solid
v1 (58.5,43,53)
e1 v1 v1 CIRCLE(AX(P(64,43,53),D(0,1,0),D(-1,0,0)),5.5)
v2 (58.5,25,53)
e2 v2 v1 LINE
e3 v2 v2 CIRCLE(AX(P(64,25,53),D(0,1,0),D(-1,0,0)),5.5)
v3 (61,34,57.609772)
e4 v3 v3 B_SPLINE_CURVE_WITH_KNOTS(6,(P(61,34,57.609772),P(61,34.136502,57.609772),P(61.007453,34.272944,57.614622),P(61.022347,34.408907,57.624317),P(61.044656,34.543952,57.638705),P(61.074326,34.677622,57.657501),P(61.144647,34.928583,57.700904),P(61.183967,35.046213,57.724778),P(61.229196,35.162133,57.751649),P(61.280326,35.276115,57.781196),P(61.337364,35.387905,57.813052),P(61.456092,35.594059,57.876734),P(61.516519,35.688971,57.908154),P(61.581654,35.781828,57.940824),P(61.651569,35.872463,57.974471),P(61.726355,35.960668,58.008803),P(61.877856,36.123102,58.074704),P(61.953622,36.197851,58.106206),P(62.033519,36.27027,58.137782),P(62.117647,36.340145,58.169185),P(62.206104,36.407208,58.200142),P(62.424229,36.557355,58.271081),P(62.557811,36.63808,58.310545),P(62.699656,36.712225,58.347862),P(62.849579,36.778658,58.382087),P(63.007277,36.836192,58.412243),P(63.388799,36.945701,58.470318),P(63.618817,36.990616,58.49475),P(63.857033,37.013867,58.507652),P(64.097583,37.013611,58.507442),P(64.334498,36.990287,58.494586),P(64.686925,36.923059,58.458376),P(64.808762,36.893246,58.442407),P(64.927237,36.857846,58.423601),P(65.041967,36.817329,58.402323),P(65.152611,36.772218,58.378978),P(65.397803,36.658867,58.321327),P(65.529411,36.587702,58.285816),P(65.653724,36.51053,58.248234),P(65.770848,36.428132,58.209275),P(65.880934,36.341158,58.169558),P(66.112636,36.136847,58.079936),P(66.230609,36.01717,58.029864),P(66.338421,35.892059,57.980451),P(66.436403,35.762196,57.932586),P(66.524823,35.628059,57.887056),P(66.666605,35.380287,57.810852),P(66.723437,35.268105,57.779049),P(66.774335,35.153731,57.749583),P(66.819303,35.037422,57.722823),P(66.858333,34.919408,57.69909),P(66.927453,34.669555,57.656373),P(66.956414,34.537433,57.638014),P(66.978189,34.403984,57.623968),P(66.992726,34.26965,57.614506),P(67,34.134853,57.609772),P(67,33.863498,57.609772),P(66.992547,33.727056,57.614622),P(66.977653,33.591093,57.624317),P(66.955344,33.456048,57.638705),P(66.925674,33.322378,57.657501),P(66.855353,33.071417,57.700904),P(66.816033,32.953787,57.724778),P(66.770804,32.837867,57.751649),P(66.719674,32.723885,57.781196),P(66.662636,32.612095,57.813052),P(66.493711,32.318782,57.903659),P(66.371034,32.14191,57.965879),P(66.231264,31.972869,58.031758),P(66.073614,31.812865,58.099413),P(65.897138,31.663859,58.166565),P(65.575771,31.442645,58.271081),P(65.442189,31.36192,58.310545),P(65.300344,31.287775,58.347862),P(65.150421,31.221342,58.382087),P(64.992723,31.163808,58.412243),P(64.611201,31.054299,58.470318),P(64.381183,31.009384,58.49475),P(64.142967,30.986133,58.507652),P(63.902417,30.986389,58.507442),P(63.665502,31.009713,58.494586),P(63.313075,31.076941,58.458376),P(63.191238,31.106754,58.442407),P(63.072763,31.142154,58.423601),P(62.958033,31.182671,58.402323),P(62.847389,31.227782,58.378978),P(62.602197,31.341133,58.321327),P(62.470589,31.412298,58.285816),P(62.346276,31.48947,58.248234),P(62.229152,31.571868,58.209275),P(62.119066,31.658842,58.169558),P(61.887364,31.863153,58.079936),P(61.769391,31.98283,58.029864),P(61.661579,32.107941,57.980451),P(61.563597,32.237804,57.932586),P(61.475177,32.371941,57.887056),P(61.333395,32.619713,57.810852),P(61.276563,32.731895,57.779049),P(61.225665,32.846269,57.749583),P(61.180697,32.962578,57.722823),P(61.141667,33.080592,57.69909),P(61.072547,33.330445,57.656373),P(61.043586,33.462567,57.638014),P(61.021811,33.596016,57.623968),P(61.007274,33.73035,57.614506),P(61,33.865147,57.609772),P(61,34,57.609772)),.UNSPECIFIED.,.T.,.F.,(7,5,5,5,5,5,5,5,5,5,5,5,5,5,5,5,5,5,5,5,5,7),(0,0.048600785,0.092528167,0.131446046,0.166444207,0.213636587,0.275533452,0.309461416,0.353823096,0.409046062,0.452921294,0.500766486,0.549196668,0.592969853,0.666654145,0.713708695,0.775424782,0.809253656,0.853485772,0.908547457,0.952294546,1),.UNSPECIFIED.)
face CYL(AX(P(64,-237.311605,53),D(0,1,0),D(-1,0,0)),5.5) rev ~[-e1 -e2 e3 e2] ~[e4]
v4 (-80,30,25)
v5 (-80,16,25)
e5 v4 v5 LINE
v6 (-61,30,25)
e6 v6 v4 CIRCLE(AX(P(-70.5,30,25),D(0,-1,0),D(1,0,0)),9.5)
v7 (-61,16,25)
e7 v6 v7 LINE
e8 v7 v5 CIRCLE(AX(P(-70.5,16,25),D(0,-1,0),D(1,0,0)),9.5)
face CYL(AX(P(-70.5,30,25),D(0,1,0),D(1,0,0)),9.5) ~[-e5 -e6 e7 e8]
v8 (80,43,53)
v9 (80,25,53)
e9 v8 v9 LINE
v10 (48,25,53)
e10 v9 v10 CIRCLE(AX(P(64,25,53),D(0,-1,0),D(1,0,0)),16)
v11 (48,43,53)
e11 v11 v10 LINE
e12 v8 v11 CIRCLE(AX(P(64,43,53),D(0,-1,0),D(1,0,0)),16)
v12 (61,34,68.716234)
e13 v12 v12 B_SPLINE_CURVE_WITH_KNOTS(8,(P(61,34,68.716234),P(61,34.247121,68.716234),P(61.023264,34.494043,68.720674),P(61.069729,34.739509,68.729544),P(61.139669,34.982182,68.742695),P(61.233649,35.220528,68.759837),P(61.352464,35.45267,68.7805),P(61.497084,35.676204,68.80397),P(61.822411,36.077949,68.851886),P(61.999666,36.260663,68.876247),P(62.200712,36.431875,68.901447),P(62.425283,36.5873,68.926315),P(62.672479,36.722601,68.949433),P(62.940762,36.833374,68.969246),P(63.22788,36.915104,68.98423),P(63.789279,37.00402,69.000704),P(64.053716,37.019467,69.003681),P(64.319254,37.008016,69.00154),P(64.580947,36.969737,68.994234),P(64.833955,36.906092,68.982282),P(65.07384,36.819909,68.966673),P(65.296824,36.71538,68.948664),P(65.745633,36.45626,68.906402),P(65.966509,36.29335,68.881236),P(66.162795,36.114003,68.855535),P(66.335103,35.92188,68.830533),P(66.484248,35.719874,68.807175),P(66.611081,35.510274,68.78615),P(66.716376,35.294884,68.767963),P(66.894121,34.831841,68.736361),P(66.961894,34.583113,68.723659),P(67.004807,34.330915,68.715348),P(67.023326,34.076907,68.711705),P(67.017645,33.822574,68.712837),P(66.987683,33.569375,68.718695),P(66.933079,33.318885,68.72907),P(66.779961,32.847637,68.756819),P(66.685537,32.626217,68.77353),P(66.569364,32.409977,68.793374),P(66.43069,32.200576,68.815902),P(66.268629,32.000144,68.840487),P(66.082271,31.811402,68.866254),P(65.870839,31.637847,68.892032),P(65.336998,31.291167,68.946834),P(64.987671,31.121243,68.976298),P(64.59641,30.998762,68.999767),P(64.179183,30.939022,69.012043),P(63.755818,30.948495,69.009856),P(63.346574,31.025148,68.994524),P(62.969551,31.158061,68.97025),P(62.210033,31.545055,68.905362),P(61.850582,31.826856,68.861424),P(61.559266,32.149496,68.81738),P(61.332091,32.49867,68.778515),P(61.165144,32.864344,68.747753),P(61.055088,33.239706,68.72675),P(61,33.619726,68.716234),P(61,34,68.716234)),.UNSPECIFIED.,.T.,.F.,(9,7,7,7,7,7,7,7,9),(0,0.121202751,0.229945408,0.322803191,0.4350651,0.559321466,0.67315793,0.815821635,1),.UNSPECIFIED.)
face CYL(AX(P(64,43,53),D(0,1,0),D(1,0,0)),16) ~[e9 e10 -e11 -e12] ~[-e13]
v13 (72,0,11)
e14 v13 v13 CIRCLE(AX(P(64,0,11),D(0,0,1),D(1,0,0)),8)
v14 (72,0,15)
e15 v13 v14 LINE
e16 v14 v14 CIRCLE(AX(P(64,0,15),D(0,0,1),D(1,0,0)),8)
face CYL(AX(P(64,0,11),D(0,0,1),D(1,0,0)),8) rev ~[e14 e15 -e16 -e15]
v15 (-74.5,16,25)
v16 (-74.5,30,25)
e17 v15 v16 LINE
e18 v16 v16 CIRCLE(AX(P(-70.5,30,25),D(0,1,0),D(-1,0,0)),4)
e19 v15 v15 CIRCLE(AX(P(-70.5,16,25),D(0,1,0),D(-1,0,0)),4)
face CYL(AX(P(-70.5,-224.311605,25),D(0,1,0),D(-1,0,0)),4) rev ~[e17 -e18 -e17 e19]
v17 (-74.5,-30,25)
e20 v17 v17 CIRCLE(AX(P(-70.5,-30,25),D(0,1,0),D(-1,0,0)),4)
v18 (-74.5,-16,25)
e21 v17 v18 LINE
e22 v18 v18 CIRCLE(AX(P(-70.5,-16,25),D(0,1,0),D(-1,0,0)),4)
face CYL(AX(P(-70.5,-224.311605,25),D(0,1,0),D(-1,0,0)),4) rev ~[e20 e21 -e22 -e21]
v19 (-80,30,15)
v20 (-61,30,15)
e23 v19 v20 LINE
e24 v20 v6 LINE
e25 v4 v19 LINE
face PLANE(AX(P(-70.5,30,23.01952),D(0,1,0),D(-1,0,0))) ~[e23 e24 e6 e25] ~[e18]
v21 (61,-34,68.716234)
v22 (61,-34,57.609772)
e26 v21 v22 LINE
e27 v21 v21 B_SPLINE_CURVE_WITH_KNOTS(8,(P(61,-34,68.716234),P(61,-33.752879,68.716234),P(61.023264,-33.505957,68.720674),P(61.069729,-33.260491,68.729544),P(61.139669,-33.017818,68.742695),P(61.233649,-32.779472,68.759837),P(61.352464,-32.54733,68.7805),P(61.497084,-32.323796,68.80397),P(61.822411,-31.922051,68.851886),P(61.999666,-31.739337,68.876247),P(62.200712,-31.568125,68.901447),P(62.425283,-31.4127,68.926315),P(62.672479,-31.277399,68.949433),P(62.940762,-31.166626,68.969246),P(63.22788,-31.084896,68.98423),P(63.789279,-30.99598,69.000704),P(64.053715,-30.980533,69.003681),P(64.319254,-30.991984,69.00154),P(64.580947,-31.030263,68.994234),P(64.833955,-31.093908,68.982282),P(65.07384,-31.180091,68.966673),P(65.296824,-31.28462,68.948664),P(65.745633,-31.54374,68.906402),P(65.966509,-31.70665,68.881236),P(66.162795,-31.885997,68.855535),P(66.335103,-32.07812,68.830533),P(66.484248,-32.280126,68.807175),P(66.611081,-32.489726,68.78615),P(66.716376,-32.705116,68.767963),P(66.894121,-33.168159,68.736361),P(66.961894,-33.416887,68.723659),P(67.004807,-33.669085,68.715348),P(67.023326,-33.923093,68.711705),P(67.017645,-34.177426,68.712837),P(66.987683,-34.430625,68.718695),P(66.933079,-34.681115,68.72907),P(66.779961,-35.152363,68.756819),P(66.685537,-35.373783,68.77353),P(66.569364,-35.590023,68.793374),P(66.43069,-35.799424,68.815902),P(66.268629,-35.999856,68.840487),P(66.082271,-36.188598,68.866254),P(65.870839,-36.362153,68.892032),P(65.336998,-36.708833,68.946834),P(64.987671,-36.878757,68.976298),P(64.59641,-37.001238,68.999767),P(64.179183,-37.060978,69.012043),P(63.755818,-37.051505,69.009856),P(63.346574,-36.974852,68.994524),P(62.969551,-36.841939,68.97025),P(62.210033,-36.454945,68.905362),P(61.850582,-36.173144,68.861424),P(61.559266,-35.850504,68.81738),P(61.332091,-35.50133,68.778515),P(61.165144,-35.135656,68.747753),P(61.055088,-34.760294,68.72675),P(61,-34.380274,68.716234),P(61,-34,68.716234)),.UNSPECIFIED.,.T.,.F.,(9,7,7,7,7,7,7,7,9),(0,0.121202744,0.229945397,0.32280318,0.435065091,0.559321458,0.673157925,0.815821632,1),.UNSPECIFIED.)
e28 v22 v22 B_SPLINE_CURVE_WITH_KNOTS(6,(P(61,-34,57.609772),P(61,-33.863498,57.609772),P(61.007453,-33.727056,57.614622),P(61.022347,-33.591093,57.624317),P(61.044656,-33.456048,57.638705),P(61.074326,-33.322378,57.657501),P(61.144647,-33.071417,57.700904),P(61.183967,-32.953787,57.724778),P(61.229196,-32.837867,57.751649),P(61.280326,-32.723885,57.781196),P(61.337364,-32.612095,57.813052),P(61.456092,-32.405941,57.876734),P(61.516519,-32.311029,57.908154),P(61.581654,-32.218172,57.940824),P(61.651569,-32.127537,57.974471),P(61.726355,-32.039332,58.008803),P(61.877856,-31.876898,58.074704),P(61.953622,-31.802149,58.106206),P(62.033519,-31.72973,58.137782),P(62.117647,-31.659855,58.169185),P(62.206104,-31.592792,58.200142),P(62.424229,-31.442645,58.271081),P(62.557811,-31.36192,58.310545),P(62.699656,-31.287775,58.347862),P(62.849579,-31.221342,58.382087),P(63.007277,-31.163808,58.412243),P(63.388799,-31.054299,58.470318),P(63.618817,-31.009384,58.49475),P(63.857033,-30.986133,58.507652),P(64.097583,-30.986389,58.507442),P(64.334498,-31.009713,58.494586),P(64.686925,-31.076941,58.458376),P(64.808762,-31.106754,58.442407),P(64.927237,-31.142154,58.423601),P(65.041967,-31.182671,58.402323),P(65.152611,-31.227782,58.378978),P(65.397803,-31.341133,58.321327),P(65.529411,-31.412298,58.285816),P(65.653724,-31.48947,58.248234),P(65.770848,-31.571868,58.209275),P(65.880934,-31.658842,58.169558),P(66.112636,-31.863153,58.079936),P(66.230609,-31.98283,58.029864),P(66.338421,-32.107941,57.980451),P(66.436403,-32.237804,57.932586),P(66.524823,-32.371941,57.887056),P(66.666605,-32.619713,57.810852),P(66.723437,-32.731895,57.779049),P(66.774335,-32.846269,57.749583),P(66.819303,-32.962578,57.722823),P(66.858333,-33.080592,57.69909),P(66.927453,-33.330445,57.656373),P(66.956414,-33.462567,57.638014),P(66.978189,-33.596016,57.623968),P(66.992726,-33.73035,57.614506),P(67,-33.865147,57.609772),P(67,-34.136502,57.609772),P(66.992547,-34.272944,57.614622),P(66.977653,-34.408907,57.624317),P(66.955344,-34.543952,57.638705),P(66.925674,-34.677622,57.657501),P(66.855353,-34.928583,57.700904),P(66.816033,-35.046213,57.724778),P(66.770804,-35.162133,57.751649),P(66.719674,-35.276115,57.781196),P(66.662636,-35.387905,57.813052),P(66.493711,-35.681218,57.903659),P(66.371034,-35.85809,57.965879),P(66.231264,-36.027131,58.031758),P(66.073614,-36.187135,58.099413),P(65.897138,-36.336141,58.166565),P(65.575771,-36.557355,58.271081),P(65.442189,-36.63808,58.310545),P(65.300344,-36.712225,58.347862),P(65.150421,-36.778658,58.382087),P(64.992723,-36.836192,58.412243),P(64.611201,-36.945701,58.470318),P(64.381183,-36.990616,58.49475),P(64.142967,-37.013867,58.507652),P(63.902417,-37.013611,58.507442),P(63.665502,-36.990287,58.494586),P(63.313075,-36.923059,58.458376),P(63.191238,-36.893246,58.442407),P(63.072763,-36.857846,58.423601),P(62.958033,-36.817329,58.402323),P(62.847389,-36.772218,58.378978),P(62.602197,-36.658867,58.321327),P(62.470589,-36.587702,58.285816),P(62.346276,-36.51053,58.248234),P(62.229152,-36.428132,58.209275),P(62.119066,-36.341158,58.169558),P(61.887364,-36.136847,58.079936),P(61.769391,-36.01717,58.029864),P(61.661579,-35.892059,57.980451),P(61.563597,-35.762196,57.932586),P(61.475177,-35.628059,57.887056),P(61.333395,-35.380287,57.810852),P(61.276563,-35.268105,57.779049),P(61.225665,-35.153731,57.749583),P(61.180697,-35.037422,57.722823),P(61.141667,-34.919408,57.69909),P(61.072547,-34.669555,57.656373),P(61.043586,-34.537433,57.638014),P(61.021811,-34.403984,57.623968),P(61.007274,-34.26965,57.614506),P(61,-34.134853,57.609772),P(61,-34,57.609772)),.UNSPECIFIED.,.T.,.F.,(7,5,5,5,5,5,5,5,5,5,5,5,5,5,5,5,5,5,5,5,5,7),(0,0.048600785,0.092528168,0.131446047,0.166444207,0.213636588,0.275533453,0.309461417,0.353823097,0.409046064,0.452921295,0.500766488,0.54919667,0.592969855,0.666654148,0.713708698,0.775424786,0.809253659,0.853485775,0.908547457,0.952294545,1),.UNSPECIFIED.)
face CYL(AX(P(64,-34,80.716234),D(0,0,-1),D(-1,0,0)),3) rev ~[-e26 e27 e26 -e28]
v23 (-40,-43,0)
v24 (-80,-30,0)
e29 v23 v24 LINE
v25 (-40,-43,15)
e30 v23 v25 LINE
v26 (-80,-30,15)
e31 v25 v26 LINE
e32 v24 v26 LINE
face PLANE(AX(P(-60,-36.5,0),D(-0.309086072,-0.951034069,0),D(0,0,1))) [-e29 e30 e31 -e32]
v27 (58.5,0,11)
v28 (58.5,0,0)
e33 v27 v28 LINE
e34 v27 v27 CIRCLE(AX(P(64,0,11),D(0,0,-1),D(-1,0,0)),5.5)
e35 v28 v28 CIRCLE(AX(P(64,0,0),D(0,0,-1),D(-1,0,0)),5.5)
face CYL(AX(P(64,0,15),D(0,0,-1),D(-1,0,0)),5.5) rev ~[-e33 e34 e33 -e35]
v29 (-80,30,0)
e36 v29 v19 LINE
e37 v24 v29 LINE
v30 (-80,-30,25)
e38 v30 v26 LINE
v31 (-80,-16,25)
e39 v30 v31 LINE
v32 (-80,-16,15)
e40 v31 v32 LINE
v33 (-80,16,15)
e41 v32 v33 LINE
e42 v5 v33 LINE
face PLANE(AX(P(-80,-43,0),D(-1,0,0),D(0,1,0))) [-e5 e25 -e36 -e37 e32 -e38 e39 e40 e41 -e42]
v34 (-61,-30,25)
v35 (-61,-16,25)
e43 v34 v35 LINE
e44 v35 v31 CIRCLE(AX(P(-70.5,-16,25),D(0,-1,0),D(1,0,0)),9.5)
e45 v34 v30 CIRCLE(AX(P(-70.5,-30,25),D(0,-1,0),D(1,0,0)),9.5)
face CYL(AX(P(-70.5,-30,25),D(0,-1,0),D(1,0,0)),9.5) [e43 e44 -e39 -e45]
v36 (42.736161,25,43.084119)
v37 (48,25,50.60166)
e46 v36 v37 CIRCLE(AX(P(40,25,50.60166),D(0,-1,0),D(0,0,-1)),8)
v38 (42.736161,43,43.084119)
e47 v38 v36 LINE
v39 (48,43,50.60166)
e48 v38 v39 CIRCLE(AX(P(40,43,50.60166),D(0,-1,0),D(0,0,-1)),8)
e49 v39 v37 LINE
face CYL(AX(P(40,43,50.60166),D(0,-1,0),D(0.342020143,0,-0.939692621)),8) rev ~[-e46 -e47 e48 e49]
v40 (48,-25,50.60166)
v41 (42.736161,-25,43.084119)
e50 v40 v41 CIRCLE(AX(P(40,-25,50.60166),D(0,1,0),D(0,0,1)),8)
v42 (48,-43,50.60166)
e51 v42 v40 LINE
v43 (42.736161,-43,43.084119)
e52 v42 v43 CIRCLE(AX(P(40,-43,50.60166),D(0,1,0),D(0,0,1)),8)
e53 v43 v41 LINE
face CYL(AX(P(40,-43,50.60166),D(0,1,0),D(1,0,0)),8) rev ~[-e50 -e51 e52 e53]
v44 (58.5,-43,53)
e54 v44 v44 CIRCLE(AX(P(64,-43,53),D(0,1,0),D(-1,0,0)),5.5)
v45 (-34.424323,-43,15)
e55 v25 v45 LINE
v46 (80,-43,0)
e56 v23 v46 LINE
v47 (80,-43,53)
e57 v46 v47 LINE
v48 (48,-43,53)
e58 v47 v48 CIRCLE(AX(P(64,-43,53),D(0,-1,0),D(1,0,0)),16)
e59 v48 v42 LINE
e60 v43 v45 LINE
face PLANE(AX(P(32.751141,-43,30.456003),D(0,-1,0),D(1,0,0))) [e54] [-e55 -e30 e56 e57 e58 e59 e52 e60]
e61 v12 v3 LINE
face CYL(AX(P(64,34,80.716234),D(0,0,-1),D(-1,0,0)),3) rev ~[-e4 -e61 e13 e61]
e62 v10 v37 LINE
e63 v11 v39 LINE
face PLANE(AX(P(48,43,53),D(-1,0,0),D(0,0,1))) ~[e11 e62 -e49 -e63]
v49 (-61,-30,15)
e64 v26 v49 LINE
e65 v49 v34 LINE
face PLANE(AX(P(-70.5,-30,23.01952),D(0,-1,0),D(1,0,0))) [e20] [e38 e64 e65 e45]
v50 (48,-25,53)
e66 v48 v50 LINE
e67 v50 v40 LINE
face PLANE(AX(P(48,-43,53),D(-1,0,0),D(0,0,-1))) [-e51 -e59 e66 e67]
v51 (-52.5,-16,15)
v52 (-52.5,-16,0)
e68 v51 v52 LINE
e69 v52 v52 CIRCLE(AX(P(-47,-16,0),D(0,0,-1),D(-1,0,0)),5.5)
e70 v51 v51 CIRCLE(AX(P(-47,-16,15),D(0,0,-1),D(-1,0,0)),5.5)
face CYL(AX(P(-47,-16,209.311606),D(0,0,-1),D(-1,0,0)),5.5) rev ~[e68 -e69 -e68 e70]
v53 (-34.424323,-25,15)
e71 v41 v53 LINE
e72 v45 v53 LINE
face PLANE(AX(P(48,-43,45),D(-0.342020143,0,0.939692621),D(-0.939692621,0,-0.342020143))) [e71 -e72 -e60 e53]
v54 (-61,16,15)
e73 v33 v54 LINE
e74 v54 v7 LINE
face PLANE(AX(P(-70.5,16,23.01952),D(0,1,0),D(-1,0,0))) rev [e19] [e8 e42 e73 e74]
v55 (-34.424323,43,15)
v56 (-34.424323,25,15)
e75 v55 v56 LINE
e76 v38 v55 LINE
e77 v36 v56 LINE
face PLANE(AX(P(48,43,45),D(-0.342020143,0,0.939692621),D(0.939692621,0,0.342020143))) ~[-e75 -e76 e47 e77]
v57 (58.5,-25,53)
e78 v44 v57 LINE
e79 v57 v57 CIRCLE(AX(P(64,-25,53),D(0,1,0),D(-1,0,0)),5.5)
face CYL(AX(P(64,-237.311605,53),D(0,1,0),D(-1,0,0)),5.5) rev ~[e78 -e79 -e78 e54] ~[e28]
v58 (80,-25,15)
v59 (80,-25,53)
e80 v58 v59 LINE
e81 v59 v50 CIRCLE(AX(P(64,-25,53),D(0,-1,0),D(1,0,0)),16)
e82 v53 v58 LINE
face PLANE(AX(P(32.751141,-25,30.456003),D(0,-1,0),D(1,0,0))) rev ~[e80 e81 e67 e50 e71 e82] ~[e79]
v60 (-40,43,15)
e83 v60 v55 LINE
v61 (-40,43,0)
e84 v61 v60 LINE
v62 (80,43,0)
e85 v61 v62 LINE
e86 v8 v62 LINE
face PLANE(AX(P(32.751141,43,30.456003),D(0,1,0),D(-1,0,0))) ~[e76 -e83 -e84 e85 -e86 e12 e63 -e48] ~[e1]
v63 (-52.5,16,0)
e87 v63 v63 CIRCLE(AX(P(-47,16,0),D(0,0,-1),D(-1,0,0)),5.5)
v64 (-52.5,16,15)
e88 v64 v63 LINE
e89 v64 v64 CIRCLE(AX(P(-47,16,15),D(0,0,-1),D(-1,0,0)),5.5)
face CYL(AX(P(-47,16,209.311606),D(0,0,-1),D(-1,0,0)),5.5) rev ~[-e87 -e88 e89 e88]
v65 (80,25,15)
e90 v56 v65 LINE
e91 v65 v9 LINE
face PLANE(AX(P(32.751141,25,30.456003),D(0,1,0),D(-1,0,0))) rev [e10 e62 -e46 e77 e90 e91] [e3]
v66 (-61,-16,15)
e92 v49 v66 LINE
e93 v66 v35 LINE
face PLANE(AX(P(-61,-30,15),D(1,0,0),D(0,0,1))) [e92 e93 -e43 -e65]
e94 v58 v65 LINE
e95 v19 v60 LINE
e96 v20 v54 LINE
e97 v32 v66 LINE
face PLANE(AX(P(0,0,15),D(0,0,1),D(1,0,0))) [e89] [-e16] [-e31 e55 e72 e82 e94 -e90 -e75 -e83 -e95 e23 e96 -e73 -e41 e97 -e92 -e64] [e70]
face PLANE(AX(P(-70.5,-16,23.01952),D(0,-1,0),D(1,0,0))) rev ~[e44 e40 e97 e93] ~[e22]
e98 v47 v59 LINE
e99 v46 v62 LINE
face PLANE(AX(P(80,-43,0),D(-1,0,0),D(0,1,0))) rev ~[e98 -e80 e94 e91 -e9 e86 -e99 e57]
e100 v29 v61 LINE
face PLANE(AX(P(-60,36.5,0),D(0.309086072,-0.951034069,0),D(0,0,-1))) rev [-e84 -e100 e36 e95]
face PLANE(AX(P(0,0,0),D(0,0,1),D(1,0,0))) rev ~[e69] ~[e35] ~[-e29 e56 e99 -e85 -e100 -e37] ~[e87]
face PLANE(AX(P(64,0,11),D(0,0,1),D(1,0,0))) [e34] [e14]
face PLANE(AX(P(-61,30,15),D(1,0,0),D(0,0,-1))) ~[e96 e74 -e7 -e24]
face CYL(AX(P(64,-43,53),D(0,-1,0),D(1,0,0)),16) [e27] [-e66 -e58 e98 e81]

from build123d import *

# Parameters (mm, degrees)
F0_W            = 160
F0_H            = 86
F1_DEPTH        = 15
F3_DEPTH        = 18
F4_R            = 8
F6_D            = 11
F9_DEPTH        = 14
F11_D           = 8
F12_C1_SIZE2    = 13
F12_C1_SIZE     = 40
F12_C2_SIZE2    = 40
F12_C2_SIZE     = 13
F16_D           = 6
F16_DEPTH       = 12
F16_START       = 0.2837665
F16_TIP         = 1.8025818571
F18_D           = 11
F20_D           = 11
F20_CBORE_D     = 16
F20_CBORE_DEPTH = 4


# Not quite as in the source:
# - two fillets or chamfers of one size are made in one step
# - a pattern or mirror of a feature is missing from the dataset's text; its kind, count and spacing are read off the source's solid


with BuildPart() as f1:
    # F0 (on Top) → F1 (new body)
    with BuildSketch(Plane.XY):
        Rectangle(F0_W, F0_H)
    extrude(amount=F1_DEPTH)

    # F2 (on face) → F3 (join)
    with BuildSketch(Plane.XZ.offset(43)):
        with BuildLine():
            Line((48, 45), (-34.4243225836, 15))
            Line((-34.4243225836, 15), (80, 15))
            Line((80, 15), (80, 53))
            ThreePointArc((80, 53), (64, 69), (48, 53))
            Line((48, 53), (48, 45))
        make_face()
    f3 = extrude(amount=-F3_DEPTH)

    # F3_copies: F3 across plane
    add(f3.mirror(Plane.ZX))

    # F4
    f4_edges = [f1.edges().sort_by_distance(p)[0] for p in [
        (48, -34, 45),
        (48, 34, 45),
    ]]
    fillet(f4_edges, radius=F4_R)

    # F6 (through all)
    with Locations(Plane.XZ.offset(43)):
        with Locations((64, 53)):
            Hole(F6_D / 2)

    # F8 (on offset) → F9 (join)
    with BuildSketch(Plane.XZ.offset(30)):
        with BuildLine():
            Line((-80, 25), (-80, 15))
            Line((-80, 15), (-61, 15))
            Line((-61, 15), (-61, 25))
            ThreePointArc((-61, 25), (-70.5, 34.5), (-80, 25))
        make_face()
    f9 = extrude(amount=-F9_DEPTH)

    # F9_copies: F9 across plane
    add(f9.mirror(Plane.ZX))

    # F11 (through all)
    with Locations(Plane.XZ.offset(30)):
        with Locations((-70.5, 25)):
            Hole(F11_D / 2)

    # F12: chamfer of 40 x 13 on 2 edges, made by hand

    # F12_c1
    f12_c1_edges = [f1.edges().sort_by_distance(p)[0] for p in [
        (-80, -43, 7.5),
    ]]
    f12_c1_side = f1.faces().sort_by_distance((-79.74, -43, 7.5))[0]
    chamfer(f12_c1_edges, length=F12_C1_SIZE, length2=F12_C1_SIZE2, reference=f12_c1_side)

    # F12_c2
    f12_c2_edges = [f1.edges().sort_by_distance(p)[0] for p in [
        (-80, 43, 7.5),
    ]]
    f12_c2_side = f1.faces().sort_by_distance((-80, 42.74, 7.5))[0]
    chamfer(f12_c2_edges, length=F12_C2_SIZE, length2=F12_C2_SIZE2, reference=f12_c2_side)

    # F16
    # its depths count from where the whole tool has entered the part; down to there all is cleared
    with Locations(Plane.XY.offset(69).offset(-F16_START)):
        with Locations((64, -34), (64, 34)):
            Hole(F16_D / 2, depth=F16_DEPTH)
            with Locations((0, 0, -(F16_DEPTH + F16_TIP / 2))):  # 118° drill point
                Cone(0, F16_D / 2, F16_TIP, mode=Mode.SUBTRACT)

    # F18 (through all)
    with Locations(Plane.XY.offset(15)):
        with Locations((-47, -16), (-47, 16)):
            Hole(F18_D / 2)

    # F20 (through all)
    with Locations(Plane.XY.offset(15)):
        with Locations((64, 0)):
            CounterBoreHole(F20_D / 2, F20_CBORE_D / 2, F20_CBORE_DEPTH)


solid = f1.part
